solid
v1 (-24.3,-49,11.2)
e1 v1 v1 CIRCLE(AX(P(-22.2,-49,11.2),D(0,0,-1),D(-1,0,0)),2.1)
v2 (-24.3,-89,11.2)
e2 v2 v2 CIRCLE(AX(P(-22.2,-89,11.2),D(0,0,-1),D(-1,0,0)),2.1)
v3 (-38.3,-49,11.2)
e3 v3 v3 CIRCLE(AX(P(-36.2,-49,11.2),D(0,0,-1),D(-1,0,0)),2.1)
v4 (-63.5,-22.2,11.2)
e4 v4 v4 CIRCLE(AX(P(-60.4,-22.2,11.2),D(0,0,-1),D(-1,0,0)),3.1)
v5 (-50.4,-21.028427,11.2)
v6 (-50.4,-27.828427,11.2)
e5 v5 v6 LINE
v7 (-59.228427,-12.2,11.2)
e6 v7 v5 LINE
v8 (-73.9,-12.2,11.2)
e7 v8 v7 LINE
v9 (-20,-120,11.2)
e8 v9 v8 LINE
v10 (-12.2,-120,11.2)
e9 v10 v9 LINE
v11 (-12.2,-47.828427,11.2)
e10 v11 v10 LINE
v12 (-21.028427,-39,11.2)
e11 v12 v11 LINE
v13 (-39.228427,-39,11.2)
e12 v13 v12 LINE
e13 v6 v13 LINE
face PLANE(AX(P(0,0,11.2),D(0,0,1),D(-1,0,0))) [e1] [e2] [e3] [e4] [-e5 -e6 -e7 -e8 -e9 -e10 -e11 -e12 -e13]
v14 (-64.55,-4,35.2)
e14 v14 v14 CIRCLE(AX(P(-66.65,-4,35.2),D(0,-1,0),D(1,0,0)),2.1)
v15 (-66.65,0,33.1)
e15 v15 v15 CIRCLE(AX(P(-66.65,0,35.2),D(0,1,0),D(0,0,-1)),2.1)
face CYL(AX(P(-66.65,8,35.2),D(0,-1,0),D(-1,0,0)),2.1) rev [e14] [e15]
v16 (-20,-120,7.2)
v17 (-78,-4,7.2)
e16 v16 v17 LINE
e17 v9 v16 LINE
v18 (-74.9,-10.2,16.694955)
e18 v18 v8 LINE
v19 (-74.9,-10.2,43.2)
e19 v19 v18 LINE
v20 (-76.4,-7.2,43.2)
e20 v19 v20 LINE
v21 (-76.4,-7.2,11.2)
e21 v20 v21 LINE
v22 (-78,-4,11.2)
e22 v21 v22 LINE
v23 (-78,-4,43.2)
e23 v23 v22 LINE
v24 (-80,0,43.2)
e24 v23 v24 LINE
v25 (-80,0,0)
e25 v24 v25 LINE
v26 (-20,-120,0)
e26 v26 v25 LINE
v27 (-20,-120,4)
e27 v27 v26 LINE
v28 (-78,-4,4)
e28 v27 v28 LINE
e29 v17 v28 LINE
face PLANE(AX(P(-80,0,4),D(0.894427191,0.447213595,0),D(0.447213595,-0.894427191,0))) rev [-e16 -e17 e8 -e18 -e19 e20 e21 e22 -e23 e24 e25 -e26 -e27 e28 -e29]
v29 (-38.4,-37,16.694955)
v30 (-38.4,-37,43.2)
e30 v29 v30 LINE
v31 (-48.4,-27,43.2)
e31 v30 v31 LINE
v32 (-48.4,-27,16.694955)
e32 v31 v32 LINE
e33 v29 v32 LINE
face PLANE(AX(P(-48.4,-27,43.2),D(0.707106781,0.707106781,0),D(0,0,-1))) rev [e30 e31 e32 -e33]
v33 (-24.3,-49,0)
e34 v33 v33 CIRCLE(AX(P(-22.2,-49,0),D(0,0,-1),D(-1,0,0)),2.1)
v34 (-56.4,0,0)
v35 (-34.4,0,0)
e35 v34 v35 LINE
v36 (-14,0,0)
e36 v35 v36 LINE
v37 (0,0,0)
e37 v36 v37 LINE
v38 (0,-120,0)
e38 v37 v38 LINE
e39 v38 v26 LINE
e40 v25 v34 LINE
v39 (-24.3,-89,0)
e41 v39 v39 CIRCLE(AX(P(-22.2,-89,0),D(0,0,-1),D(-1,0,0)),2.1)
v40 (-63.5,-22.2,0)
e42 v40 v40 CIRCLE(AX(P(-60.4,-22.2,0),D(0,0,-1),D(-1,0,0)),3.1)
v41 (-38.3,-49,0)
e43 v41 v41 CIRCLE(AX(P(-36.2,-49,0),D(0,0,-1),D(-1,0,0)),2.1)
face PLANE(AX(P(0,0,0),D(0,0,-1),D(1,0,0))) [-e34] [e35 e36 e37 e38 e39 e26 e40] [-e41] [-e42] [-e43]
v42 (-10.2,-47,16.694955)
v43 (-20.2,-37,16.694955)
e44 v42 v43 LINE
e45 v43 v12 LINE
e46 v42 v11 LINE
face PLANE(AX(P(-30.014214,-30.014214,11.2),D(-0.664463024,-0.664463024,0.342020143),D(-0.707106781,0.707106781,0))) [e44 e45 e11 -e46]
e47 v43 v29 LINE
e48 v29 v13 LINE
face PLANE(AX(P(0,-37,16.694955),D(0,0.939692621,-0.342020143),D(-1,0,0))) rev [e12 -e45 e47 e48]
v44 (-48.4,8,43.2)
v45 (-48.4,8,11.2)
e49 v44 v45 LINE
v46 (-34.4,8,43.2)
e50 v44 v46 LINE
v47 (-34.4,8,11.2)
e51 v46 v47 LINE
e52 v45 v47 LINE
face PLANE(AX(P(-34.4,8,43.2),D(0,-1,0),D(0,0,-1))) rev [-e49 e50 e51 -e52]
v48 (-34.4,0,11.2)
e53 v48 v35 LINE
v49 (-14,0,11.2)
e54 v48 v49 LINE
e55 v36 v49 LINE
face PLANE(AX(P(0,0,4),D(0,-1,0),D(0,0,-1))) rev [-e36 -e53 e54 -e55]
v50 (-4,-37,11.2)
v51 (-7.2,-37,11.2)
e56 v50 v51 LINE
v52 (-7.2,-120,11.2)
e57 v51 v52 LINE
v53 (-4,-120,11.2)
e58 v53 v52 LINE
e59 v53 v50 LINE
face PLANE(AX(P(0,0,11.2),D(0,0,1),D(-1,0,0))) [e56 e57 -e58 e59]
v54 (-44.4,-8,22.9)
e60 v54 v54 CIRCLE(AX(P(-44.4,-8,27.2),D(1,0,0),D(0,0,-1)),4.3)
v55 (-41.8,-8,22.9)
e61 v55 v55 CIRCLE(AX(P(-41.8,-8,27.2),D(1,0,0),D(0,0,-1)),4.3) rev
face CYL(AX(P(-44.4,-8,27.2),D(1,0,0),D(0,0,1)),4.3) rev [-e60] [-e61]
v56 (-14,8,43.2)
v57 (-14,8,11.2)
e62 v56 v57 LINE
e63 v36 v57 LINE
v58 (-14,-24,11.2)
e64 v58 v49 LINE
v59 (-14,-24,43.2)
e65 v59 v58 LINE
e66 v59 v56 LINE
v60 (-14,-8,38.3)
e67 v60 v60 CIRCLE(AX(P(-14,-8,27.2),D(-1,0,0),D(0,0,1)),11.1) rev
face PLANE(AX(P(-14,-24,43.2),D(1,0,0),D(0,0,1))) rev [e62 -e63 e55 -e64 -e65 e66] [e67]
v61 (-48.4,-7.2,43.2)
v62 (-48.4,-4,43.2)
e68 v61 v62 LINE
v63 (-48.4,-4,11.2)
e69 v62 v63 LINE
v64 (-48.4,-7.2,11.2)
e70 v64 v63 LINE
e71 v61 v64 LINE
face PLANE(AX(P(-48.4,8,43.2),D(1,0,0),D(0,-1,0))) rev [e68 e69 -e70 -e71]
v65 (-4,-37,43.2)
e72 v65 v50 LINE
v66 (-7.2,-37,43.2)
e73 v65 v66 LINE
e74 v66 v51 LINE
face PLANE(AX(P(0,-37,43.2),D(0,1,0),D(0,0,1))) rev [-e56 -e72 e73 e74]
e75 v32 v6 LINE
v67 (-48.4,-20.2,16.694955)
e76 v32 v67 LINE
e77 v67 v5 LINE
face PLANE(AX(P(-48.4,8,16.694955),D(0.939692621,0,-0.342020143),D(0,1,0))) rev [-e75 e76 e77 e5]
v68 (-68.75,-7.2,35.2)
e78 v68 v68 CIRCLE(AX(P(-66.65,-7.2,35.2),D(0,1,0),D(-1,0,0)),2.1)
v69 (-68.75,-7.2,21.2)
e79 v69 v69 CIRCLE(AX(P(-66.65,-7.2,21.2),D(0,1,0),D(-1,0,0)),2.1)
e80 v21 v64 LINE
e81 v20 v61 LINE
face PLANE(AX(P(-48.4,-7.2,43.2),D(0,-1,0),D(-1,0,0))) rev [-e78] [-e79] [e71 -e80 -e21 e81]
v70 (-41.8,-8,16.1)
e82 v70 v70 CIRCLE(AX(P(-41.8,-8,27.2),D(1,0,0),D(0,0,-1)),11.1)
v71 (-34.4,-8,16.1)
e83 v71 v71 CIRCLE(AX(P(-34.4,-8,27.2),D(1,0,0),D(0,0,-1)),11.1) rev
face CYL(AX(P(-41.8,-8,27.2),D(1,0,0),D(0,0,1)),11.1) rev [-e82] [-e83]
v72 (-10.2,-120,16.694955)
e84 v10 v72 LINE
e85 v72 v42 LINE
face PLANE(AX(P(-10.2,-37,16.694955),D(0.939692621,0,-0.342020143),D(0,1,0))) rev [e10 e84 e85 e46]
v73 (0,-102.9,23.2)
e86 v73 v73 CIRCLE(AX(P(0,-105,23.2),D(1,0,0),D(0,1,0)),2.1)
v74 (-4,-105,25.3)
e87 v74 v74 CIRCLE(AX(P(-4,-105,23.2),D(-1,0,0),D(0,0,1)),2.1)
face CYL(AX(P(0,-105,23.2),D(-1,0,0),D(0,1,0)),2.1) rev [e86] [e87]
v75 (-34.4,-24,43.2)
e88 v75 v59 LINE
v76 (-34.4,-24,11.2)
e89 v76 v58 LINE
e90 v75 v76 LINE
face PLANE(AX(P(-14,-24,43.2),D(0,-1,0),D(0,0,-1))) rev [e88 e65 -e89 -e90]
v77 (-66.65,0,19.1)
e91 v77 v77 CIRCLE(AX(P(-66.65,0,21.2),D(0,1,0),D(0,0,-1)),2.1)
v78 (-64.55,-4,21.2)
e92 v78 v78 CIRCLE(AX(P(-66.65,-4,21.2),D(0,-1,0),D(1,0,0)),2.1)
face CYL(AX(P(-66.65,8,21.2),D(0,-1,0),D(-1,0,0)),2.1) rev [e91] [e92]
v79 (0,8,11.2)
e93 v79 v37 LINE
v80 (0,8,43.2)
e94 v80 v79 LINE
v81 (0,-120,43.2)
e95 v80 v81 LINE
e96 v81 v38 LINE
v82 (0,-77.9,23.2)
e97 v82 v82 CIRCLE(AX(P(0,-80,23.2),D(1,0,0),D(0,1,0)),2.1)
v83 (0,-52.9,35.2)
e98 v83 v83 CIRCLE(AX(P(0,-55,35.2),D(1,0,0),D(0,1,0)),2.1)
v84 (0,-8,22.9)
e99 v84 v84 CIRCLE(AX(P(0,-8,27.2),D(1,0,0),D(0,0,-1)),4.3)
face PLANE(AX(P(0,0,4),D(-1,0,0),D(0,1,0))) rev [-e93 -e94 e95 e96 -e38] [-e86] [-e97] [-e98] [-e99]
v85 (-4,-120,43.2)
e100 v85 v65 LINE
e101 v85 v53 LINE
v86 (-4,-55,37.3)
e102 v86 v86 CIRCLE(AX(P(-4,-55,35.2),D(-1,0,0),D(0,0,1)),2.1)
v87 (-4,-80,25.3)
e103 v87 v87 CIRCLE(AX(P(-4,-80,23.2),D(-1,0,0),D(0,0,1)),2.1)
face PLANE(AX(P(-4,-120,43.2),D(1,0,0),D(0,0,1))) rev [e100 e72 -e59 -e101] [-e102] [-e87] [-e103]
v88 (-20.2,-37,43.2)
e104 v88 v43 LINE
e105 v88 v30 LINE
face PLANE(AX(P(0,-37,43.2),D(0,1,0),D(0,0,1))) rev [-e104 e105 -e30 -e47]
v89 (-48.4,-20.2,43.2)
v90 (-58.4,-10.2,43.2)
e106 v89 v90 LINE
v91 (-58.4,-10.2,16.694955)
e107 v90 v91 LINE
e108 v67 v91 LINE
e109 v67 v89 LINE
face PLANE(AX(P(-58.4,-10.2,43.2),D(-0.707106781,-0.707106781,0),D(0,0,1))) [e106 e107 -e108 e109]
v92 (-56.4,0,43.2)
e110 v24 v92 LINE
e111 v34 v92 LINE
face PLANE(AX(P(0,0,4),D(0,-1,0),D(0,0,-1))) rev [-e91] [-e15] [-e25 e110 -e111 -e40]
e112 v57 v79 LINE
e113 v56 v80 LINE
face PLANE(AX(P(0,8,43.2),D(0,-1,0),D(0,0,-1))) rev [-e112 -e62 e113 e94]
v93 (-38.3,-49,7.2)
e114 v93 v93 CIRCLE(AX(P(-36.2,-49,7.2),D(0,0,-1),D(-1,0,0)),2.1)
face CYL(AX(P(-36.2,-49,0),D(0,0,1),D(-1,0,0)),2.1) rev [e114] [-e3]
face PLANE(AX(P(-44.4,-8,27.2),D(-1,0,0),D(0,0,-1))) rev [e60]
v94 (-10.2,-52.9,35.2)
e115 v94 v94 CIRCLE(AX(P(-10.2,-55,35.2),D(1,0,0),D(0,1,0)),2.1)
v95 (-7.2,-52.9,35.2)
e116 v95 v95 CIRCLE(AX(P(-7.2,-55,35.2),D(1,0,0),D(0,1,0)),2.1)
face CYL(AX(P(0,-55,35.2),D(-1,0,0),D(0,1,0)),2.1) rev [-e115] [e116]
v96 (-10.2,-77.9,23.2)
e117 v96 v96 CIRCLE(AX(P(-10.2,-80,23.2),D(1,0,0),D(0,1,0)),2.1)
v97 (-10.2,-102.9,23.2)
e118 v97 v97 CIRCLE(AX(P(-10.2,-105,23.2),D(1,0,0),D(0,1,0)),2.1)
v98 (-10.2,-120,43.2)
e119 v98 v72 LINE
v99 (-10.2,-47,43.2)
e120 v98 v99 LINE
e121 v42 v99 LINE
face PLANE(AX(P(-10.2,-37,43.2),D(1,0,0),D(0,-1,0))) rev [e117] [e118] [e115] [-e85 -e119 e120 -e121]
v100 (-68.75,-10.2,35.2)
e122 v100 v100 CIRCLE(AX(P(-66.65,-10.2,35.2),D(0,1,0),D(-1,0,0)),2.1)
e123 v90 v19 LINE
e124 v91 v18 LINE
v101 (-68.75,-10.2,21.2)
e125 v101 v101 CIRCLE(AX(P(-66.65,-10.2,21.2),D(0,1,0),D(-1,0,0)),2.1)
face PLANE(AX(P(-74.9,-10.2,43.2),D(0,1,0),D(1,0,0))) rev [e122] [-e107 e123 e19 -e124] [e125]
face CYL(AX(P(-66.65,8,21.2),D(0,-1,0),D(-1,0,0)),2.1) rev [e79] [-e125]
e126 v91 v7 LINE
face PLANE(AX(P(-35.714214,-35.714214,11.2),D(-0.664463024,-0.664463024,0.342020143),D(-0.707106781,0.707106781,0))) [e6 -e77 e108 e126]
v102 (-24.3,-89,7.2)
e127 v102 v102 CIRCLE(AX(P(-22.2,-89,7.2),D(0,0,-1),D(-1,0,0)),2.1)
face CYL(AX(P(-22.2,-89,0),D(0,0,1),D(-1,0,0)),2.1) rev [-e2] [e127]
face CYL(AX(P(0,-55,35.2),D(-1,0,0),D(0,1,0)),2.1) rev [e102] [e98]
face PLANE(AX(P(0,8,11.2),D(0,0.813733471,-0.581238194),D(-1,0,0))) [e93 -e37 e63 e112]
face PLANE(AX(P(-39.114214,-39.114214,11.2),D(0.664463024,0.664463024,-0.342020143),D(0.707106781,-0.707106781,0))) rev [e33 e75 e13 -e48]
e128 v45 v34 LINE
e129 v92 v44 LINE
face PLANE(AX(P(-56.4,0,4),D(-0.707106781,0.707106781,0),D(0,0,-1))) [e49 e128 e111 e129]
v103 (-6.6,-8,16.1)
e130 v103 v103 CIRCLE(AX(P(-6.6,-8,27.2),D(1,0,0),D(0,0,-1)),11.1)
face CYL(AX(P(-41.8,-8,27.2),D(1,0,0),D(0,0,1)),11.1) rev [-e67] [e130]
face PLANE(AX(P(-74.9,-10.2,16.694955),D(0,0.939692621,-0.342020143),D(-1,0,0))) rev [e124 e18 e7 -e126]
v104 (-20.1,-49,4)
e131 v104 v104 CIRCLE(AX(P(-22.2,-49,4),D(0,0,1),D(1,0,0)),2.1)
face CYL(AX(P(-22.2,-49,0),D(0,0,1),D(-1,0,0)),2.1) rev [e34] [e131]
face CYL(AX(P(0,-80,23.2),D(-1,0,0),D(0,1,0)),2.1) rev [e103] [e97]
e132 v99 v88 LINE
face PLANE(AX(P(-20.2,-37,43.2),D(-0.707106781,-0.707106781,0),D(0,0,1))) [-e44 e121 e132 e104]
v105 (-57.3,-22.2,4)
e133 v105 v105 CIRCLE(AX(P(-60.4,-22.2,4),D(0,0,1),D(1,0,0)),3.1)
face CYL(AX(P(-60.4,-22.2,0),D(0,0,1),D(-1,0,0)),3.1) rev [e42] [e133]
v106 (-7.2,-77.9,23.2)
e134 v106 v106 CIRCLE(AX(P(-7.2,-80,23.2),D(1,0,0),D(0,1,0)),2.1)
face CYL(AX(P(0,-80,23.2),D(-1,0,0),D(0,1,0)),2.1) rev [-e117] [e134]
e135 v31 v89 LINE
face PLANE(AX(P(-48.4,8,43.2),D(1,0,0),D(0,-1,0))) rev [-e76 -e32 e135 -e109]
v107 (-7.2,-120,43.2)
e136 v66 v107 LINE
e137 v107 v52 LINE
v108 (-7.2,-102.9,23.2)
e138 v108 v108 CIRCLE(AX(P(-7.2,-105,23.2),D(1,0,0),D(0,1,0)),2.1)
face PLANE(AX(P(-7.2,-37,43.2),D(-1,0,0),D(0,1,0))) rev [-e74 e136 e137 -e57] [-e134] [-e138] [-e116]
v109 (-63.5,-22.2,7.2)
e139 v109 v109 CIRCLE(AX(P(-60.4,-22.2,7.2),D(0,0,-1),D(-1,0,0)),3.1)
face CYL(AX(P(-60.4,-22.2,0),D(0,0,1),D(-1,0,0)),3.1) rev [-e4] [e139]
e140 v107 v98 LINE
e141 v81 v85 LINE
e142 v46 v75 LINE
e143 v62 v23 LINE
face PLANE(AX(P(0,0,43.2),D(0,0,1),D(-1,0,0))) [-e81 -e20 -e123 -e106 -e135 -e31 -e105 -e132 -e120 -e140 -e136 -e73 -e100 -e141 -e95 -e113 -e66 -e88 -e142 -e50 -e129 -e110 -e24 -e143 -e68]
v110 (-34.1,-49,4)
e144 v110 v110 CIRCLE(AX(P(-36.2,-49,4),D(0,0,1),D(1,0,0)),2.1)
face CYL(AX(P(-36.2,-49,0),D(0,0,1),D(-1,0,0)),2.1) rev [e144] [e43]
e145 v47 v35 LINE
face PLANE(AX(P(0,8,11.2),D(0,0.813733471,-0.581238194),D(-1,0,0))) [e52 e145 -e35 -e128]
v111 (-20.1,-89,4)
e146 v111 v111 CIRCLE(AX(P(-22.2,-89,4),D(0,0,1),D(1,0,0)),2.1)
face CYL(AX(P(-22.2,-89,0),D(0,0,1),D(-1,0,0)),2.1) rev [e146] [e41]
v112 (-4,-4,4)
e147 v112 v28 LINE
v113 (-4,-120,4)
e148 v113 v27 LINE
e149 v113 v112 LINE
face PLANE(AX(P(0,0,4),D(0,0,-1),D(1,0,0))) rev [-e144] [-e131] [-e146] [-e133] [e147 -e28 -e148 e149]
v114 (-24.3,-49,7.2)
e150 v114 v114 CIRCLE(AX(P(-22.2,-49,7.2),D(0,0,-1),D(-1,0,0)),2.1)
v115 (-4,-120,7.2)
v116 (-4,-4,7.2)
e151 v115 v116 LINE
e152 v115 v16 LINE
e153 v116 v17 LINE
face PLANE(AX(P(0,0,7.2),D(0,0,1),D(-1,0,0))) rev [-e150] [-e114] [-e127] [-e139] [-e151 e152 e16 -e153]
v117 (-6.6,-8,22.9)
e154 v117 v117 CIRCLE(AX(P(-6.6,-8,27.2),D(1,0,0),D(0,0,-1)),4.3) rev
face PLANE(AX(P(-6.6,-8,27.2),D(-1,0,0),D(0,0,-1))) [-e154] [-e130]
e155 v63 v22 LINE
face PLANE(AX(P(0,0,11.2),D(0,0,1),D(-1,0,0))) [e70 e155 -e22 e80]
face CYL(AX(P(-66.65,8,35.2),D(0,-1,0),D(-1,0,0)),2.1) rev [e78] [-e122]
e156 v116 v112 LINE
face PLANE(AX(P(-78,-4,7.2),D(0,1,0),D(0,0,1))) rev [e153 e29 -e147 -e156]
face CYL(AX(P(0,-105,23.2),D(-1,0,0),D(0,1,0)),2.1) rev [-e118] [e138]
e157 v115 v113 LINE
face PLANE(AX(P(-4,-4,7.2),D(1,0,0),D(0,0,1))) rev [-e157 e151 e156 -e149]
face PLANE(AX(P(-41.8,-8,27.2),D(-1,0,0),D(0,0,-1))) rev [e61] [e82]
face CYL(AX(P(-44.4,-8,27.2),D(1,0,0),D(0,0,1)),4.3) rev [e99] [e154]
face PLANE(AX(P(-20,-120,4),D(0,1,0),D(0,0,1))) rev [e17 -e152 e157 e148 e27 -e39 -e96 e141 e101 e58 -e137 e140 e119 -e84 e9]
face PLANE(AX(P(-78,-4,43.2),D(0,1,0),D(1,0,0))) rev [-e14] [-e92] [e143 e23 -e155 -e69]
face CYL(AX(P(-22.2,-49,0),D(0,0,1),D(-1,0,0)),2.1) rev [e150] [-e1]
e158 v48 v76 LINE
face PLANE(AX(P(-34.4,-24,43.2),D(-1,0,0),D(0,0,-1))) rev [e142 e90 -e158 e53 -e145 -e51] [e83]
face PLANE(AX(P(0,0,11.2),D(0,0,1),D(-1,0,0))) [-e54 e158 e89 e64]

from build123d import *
from OCP.BRepFilletAPI import BRepFilletAPI_MakeChamfer

# Parameters (mm, degrees)
DODANIE_WYCI_GNI_CIE1_DEPTH     = 4
DODANIE_WYCI_GNI_CIE2_DEPTH     = 3.2
DODANIE_WYCI_GNI_CIE3_DEPTH     = 4
DODANIE_WYCI_GNI_CIE4_DEPTH     = 32
WYTNIJ_WYCI_GNI_CIE1_DEPTH      = 17.6
WYTNIJ_WYCI_GNI_CIE1_DEPTH_BACK = 17.6
SZKIC5_R                        = 11.1
SFAZOWANIE1_SIZE                = 11.2
SFAZOWANIE1_SIZE_2              = 8
WYTNIJ_WYCI_GNI_CIE2_DEPTH      = 20.2
WYTNIJ_WYCI_GNI_CIE2_DEPTH_BACK = 140.211637445
SZKIC6_R                        = 4.3
SZKIC7_W                        = 4
SZKIC7_H                        = 83
SZKIC7_W_2                      = 3
DODANIE_WYCI_GNI_CIE5_DEPTH     = 32
SFAZOWANIE2_SIZE                = 10
SFAZOWANIE3_SIZE                = 2
SFAZOWANIE3_SIZE2               = 5.494954839
SZKIC8_R                        = 2.1
OTWORY_TYL_DEPTH                = 143.556234518
SZKIC9_R                        = 3.1
SZKIC9_R_2                      = 2.1
OTWORY_SPOD_DEPTH               = 148.729482501
SZKIC10_R                       = 2.1
OTWORY_BOK_DEPTH                = 146.390095949
SFAZOWANIE4_SIZE                = 8
SZKIC11_W                       = 89.626948643
SZKIC11_H                       = 50.587454561
WYTNIJ_WYCI_GNI_CIE3_DEPTH      = 158.003948995


with BuildPart() as part:
    # Szkic1 → Dodanie-wyciągnięcie1 (new body)
    with BuildSketch(Plane.XY):
        Polygon((0, 0), (80, 0), (20, -120), (0, -120), align=None)
    extrude(amount=DODANIE_WYCI_GNI_CIE1_DEPTH)

    # Szkic2 → Dodanie-wyciągnięcie2 (add)
    with BuildSketch(Plane.XY.offset(4)):
        Polygon((80, 0), (0, 0), (0, -120), (4, -120), (4, -4), (78, -4), align=None)
    extrude(amount=DODANIE_WYCI_GNI_CIE2_DEPTH)

    # Szkic3 → Dodanie-wyciągnięcie3 (add)
    with BuildSketch(Plane.XY.offset(7.2)):
        Polygon((78, -4), (80, 0), (0, 0), (0, -120), (4, -120), (20, -120), align=None)
    extrude(amount=DODANIE_WYCI_GNI_CIE3_DEPTH)

    # Szkic4 → Dodanie-wyciągnięcie4 (add)
    with BuildSketch(Plane.XY.offset(11.2)):
        Polygon((0, 8), (0, -37), (48.4, -37), (48.4, 8), (34.4, 8), (34.4, -24), (14, -24), (14, 8), align=None)
    extrude(amount=DODANIE_WYCI_GNI_CIE4_DEPTH)

    # Szkic5 → Wytnij-wyciągnięcie1 (cut, two sides: drawn at the far end of the back side and taken through both)
    with BuildSketch(Plane(origin=(24.2, 0, 0), x_dir=(0, 0, -1), z_dir=(1, 0, 0)).offset(-WYTNIJ_WYCI_GNI_CIE1_DEPTH_BACK)):
        with Locations(Location((-27.2, -8, 0), (0, 0, 180))):
            Circle(SZKIC5_R)
    extrude(amount=WYTNIJ_WYCI_GNI_CIE1_DEPTH + WYTNIJ_WYCI_GNI_CIE1_DEPTH_BACK, mode=Mode.SUBTRACT)

    # Sfazowanie1
    sfazowanie1_edges_1 = [part.edges().sort_by_distance(p)[0] for p in [
        (7, 0, 11.2),
    ]]
    sfazowanie1_side_1 = [part.faces().sort_by_distance(p)[0] for p in [
        (7, 0, 11.04),
    ]]
    sfazowanie1_edges_2 = [part.edges().sort_by_distance(p)[0] for p in [
        (41.4, 0, 11.2),
    ]]
    sfazowanie1_side_2 = [part.faces().sort_by_distance(p)[0] for p in [
        (41.4, 0, 11.04),
    ]]
    sfazowanie1 = BRepFilletAPI_MakeChamfer(part.part.solid().wrapped)
    for e in sfazowanie1_edges_1:
        sfazowanie1.Add(SFAZOWANIE1_SIZE - 0.0001, SFAZOWANIE1_SIZE_2 - 0.0001, e.wrapped, sfazowanie1_side_1[0].wrapped)
    for e in sfazowanie1_edges_2:
        sfazowanie1.Add(SFAZOWANIE1_SIZE - 0.0001, SFAZOWANIE1_SIZE_2 - 0.0001, e.wrapped, sfazowanie1_side_2[0].wrapped)
    add(Compound.cast(sfazowanie1.Shape()), mode=Mode.REPLACE)  # a hair under: the kernel refuses the full size

    # Szkic6 → Wytnij-wyciągnięcie2 (cut, two sides: drawn at the far end of the back side and taken through both)
    with BuildSketch(Plane(origin=(24.2, 0, 0), x_dir=(0, 0, -1), z_dir=(1, 0, 0)).offset(-WYTNIJ_WYCI_GNI_CIE2_DEPTH_BACK)):
        with Locations((-27.2, -8)):
            Circle(SZKIC6_R)
    extrude(amount=WYTNIJ_WYCI_GNI_CIE2_DEPTH + WYTNIJ_WYCI_GNI_CIE2_DEPTH_BACK, mode=Mode.SUBTRACT)

    # Szkic7 → Dodanie-wyciągnięcie5 (add)
    with BuildSketch(Plane.XY.offset(11.2)):
        with Locations((2, -78.5)):
            Rectangle(SZKIC7_W, SZKIC7_H)
        with Locations((8.7, -78.5)):
            Rectangle(SZKIC7_W_2, SZKIC7_H)
        Polygon((48.4, 0), (80, 0), (78, -4), (48.4, -4), align=None)
        Polygon((48.4, -7.2), (76.4, -7.2), (74.9, -10.2), (48.4, -10.2), align=None)
    extrude(amount=DODANIE_WYCI_GNI_CIE5_DEPTH)

    # Sfazowanie2
    sfazowanie2_edges = [part.edges().sort_by_distance(p)[0] for p in [
        (10.2, -37, 27.2),
        (48.4, -10.2, 27.2),
        (48.4, -37, 27.2),
    ]]
    chamfer(sfazowanie2_edges, length=SFAZOWANIE2_SIZE)

    # Sfazowanie3
    sfazowanie3_edges = [part.edges().sort_by_distance(p)[0] for p in [
        (10.2, -83.5, 11.2),
        (48.4, -23.6, 11.2),
        (29.3, -37, 11.2),
        (66.65, -10.2, 11.2),
        (15.2, -42, 11.2),
        (53.4, -15.2, 11.2),
        (43.4, -32, 11.2),
    ]]
    sfazowanie3_side = [part.faces().sort_by_distance(p)[0] for p in [
        (33.378295522, -61.643653627, 11.2),
    ]]
    chamfer(sfazowanie3_edges, length=SFAZOWANIE3_SIZE, length2=SFAZOWANIE3_SIZE2, reference=sfazowanie3_side[0])

    # Szkic8 → Otwory tyl (cut, through all)
    with BuildSketch(Plane.XZ.offset(10.2)):
        with Locations((66.65, 35.2)):
            Circle(SZKIC8_R)
        with Locations((66.65, 21.2)):
            Circle(SZKIC8_R)
    extrude(amount=-OTWORY_TYL_DEPTH, mode=Mode.SUBTRACT)

    # Szkic9 → Otwory spod (cut, through all)
    with BuildSketch(Plane.XY.offset(11.2)):
        with Locations((60.4, -22.2)):
            Circle(SZKIC9_R)
        with Locations((22.2, -49)):
            Circle(SZKIC9_R_2)
        with Locations((22.2, -89)):
            Circle(SZKIC9_R_2)
        with Locations((36.2, -49)):
            Circle(SZKIC9_R_2)
    extrude(amount=-OTWORY_SPOD_DEPTH, mode=Mode.SUBTRACT)

    # Szkic10 → Otwory bok (cut, through all)
    with BuildSketch(Plane(origin=(10.2, 0, 0), x_dir=(0, 0, -1), z_dir=(1, 0, 0))):
        with Locations(Location((-23.2, -80, 0), (0, 0, 90))):
            Circle(SZKIC10_R)
        with Locations(Location((-35.2, -55, 0), (0, 0, 90))):
            Circle(SZKIC10_R)
        with Locations(Location((-23.2, -105, 0), (0, 0, 90))):
            Circle(SZKIC10_R)
    extrude(amount=-OTWORY_BOK_DEPTH, mode=Mode.SUBTRACT)

    # Sfazowanie4
    sfazowanie4_edges = [part.edges().sort_by_distance(p)[0] for p in [
        (48.4, 0, 21.60005),
    ]]
    chamfer(sfazowanie4_edges, length=SFAZOWANIE4_SIZE - 0.0001)  # a hair under: the kernel refuses the full size


with BuildPart() as body_2:
    # Lustro1: mirrored copy
    add(part.part.mirror(Plane(origin=(0, 0, 4), x_dir=(0, 0, 1), z_dir=(1, 0, 0))))


with BuildPart() as part_1:
    add(part.part)

    # Szkic11 → Wytnij-wyciągnięcie3 (cut, through all)
    with BuildSketch(Plane.XZ.offset(120)):
        with Locations((44.813474322, 25.293727281)):
            Rectangle(SZKIC11_W, SZKIC11_H)
    extrude(amount=-WYTNIJ_WYCI_GNI_CIE3_DEPTH, mode=Mode.SUBTRACT)


solid = body_2.part
